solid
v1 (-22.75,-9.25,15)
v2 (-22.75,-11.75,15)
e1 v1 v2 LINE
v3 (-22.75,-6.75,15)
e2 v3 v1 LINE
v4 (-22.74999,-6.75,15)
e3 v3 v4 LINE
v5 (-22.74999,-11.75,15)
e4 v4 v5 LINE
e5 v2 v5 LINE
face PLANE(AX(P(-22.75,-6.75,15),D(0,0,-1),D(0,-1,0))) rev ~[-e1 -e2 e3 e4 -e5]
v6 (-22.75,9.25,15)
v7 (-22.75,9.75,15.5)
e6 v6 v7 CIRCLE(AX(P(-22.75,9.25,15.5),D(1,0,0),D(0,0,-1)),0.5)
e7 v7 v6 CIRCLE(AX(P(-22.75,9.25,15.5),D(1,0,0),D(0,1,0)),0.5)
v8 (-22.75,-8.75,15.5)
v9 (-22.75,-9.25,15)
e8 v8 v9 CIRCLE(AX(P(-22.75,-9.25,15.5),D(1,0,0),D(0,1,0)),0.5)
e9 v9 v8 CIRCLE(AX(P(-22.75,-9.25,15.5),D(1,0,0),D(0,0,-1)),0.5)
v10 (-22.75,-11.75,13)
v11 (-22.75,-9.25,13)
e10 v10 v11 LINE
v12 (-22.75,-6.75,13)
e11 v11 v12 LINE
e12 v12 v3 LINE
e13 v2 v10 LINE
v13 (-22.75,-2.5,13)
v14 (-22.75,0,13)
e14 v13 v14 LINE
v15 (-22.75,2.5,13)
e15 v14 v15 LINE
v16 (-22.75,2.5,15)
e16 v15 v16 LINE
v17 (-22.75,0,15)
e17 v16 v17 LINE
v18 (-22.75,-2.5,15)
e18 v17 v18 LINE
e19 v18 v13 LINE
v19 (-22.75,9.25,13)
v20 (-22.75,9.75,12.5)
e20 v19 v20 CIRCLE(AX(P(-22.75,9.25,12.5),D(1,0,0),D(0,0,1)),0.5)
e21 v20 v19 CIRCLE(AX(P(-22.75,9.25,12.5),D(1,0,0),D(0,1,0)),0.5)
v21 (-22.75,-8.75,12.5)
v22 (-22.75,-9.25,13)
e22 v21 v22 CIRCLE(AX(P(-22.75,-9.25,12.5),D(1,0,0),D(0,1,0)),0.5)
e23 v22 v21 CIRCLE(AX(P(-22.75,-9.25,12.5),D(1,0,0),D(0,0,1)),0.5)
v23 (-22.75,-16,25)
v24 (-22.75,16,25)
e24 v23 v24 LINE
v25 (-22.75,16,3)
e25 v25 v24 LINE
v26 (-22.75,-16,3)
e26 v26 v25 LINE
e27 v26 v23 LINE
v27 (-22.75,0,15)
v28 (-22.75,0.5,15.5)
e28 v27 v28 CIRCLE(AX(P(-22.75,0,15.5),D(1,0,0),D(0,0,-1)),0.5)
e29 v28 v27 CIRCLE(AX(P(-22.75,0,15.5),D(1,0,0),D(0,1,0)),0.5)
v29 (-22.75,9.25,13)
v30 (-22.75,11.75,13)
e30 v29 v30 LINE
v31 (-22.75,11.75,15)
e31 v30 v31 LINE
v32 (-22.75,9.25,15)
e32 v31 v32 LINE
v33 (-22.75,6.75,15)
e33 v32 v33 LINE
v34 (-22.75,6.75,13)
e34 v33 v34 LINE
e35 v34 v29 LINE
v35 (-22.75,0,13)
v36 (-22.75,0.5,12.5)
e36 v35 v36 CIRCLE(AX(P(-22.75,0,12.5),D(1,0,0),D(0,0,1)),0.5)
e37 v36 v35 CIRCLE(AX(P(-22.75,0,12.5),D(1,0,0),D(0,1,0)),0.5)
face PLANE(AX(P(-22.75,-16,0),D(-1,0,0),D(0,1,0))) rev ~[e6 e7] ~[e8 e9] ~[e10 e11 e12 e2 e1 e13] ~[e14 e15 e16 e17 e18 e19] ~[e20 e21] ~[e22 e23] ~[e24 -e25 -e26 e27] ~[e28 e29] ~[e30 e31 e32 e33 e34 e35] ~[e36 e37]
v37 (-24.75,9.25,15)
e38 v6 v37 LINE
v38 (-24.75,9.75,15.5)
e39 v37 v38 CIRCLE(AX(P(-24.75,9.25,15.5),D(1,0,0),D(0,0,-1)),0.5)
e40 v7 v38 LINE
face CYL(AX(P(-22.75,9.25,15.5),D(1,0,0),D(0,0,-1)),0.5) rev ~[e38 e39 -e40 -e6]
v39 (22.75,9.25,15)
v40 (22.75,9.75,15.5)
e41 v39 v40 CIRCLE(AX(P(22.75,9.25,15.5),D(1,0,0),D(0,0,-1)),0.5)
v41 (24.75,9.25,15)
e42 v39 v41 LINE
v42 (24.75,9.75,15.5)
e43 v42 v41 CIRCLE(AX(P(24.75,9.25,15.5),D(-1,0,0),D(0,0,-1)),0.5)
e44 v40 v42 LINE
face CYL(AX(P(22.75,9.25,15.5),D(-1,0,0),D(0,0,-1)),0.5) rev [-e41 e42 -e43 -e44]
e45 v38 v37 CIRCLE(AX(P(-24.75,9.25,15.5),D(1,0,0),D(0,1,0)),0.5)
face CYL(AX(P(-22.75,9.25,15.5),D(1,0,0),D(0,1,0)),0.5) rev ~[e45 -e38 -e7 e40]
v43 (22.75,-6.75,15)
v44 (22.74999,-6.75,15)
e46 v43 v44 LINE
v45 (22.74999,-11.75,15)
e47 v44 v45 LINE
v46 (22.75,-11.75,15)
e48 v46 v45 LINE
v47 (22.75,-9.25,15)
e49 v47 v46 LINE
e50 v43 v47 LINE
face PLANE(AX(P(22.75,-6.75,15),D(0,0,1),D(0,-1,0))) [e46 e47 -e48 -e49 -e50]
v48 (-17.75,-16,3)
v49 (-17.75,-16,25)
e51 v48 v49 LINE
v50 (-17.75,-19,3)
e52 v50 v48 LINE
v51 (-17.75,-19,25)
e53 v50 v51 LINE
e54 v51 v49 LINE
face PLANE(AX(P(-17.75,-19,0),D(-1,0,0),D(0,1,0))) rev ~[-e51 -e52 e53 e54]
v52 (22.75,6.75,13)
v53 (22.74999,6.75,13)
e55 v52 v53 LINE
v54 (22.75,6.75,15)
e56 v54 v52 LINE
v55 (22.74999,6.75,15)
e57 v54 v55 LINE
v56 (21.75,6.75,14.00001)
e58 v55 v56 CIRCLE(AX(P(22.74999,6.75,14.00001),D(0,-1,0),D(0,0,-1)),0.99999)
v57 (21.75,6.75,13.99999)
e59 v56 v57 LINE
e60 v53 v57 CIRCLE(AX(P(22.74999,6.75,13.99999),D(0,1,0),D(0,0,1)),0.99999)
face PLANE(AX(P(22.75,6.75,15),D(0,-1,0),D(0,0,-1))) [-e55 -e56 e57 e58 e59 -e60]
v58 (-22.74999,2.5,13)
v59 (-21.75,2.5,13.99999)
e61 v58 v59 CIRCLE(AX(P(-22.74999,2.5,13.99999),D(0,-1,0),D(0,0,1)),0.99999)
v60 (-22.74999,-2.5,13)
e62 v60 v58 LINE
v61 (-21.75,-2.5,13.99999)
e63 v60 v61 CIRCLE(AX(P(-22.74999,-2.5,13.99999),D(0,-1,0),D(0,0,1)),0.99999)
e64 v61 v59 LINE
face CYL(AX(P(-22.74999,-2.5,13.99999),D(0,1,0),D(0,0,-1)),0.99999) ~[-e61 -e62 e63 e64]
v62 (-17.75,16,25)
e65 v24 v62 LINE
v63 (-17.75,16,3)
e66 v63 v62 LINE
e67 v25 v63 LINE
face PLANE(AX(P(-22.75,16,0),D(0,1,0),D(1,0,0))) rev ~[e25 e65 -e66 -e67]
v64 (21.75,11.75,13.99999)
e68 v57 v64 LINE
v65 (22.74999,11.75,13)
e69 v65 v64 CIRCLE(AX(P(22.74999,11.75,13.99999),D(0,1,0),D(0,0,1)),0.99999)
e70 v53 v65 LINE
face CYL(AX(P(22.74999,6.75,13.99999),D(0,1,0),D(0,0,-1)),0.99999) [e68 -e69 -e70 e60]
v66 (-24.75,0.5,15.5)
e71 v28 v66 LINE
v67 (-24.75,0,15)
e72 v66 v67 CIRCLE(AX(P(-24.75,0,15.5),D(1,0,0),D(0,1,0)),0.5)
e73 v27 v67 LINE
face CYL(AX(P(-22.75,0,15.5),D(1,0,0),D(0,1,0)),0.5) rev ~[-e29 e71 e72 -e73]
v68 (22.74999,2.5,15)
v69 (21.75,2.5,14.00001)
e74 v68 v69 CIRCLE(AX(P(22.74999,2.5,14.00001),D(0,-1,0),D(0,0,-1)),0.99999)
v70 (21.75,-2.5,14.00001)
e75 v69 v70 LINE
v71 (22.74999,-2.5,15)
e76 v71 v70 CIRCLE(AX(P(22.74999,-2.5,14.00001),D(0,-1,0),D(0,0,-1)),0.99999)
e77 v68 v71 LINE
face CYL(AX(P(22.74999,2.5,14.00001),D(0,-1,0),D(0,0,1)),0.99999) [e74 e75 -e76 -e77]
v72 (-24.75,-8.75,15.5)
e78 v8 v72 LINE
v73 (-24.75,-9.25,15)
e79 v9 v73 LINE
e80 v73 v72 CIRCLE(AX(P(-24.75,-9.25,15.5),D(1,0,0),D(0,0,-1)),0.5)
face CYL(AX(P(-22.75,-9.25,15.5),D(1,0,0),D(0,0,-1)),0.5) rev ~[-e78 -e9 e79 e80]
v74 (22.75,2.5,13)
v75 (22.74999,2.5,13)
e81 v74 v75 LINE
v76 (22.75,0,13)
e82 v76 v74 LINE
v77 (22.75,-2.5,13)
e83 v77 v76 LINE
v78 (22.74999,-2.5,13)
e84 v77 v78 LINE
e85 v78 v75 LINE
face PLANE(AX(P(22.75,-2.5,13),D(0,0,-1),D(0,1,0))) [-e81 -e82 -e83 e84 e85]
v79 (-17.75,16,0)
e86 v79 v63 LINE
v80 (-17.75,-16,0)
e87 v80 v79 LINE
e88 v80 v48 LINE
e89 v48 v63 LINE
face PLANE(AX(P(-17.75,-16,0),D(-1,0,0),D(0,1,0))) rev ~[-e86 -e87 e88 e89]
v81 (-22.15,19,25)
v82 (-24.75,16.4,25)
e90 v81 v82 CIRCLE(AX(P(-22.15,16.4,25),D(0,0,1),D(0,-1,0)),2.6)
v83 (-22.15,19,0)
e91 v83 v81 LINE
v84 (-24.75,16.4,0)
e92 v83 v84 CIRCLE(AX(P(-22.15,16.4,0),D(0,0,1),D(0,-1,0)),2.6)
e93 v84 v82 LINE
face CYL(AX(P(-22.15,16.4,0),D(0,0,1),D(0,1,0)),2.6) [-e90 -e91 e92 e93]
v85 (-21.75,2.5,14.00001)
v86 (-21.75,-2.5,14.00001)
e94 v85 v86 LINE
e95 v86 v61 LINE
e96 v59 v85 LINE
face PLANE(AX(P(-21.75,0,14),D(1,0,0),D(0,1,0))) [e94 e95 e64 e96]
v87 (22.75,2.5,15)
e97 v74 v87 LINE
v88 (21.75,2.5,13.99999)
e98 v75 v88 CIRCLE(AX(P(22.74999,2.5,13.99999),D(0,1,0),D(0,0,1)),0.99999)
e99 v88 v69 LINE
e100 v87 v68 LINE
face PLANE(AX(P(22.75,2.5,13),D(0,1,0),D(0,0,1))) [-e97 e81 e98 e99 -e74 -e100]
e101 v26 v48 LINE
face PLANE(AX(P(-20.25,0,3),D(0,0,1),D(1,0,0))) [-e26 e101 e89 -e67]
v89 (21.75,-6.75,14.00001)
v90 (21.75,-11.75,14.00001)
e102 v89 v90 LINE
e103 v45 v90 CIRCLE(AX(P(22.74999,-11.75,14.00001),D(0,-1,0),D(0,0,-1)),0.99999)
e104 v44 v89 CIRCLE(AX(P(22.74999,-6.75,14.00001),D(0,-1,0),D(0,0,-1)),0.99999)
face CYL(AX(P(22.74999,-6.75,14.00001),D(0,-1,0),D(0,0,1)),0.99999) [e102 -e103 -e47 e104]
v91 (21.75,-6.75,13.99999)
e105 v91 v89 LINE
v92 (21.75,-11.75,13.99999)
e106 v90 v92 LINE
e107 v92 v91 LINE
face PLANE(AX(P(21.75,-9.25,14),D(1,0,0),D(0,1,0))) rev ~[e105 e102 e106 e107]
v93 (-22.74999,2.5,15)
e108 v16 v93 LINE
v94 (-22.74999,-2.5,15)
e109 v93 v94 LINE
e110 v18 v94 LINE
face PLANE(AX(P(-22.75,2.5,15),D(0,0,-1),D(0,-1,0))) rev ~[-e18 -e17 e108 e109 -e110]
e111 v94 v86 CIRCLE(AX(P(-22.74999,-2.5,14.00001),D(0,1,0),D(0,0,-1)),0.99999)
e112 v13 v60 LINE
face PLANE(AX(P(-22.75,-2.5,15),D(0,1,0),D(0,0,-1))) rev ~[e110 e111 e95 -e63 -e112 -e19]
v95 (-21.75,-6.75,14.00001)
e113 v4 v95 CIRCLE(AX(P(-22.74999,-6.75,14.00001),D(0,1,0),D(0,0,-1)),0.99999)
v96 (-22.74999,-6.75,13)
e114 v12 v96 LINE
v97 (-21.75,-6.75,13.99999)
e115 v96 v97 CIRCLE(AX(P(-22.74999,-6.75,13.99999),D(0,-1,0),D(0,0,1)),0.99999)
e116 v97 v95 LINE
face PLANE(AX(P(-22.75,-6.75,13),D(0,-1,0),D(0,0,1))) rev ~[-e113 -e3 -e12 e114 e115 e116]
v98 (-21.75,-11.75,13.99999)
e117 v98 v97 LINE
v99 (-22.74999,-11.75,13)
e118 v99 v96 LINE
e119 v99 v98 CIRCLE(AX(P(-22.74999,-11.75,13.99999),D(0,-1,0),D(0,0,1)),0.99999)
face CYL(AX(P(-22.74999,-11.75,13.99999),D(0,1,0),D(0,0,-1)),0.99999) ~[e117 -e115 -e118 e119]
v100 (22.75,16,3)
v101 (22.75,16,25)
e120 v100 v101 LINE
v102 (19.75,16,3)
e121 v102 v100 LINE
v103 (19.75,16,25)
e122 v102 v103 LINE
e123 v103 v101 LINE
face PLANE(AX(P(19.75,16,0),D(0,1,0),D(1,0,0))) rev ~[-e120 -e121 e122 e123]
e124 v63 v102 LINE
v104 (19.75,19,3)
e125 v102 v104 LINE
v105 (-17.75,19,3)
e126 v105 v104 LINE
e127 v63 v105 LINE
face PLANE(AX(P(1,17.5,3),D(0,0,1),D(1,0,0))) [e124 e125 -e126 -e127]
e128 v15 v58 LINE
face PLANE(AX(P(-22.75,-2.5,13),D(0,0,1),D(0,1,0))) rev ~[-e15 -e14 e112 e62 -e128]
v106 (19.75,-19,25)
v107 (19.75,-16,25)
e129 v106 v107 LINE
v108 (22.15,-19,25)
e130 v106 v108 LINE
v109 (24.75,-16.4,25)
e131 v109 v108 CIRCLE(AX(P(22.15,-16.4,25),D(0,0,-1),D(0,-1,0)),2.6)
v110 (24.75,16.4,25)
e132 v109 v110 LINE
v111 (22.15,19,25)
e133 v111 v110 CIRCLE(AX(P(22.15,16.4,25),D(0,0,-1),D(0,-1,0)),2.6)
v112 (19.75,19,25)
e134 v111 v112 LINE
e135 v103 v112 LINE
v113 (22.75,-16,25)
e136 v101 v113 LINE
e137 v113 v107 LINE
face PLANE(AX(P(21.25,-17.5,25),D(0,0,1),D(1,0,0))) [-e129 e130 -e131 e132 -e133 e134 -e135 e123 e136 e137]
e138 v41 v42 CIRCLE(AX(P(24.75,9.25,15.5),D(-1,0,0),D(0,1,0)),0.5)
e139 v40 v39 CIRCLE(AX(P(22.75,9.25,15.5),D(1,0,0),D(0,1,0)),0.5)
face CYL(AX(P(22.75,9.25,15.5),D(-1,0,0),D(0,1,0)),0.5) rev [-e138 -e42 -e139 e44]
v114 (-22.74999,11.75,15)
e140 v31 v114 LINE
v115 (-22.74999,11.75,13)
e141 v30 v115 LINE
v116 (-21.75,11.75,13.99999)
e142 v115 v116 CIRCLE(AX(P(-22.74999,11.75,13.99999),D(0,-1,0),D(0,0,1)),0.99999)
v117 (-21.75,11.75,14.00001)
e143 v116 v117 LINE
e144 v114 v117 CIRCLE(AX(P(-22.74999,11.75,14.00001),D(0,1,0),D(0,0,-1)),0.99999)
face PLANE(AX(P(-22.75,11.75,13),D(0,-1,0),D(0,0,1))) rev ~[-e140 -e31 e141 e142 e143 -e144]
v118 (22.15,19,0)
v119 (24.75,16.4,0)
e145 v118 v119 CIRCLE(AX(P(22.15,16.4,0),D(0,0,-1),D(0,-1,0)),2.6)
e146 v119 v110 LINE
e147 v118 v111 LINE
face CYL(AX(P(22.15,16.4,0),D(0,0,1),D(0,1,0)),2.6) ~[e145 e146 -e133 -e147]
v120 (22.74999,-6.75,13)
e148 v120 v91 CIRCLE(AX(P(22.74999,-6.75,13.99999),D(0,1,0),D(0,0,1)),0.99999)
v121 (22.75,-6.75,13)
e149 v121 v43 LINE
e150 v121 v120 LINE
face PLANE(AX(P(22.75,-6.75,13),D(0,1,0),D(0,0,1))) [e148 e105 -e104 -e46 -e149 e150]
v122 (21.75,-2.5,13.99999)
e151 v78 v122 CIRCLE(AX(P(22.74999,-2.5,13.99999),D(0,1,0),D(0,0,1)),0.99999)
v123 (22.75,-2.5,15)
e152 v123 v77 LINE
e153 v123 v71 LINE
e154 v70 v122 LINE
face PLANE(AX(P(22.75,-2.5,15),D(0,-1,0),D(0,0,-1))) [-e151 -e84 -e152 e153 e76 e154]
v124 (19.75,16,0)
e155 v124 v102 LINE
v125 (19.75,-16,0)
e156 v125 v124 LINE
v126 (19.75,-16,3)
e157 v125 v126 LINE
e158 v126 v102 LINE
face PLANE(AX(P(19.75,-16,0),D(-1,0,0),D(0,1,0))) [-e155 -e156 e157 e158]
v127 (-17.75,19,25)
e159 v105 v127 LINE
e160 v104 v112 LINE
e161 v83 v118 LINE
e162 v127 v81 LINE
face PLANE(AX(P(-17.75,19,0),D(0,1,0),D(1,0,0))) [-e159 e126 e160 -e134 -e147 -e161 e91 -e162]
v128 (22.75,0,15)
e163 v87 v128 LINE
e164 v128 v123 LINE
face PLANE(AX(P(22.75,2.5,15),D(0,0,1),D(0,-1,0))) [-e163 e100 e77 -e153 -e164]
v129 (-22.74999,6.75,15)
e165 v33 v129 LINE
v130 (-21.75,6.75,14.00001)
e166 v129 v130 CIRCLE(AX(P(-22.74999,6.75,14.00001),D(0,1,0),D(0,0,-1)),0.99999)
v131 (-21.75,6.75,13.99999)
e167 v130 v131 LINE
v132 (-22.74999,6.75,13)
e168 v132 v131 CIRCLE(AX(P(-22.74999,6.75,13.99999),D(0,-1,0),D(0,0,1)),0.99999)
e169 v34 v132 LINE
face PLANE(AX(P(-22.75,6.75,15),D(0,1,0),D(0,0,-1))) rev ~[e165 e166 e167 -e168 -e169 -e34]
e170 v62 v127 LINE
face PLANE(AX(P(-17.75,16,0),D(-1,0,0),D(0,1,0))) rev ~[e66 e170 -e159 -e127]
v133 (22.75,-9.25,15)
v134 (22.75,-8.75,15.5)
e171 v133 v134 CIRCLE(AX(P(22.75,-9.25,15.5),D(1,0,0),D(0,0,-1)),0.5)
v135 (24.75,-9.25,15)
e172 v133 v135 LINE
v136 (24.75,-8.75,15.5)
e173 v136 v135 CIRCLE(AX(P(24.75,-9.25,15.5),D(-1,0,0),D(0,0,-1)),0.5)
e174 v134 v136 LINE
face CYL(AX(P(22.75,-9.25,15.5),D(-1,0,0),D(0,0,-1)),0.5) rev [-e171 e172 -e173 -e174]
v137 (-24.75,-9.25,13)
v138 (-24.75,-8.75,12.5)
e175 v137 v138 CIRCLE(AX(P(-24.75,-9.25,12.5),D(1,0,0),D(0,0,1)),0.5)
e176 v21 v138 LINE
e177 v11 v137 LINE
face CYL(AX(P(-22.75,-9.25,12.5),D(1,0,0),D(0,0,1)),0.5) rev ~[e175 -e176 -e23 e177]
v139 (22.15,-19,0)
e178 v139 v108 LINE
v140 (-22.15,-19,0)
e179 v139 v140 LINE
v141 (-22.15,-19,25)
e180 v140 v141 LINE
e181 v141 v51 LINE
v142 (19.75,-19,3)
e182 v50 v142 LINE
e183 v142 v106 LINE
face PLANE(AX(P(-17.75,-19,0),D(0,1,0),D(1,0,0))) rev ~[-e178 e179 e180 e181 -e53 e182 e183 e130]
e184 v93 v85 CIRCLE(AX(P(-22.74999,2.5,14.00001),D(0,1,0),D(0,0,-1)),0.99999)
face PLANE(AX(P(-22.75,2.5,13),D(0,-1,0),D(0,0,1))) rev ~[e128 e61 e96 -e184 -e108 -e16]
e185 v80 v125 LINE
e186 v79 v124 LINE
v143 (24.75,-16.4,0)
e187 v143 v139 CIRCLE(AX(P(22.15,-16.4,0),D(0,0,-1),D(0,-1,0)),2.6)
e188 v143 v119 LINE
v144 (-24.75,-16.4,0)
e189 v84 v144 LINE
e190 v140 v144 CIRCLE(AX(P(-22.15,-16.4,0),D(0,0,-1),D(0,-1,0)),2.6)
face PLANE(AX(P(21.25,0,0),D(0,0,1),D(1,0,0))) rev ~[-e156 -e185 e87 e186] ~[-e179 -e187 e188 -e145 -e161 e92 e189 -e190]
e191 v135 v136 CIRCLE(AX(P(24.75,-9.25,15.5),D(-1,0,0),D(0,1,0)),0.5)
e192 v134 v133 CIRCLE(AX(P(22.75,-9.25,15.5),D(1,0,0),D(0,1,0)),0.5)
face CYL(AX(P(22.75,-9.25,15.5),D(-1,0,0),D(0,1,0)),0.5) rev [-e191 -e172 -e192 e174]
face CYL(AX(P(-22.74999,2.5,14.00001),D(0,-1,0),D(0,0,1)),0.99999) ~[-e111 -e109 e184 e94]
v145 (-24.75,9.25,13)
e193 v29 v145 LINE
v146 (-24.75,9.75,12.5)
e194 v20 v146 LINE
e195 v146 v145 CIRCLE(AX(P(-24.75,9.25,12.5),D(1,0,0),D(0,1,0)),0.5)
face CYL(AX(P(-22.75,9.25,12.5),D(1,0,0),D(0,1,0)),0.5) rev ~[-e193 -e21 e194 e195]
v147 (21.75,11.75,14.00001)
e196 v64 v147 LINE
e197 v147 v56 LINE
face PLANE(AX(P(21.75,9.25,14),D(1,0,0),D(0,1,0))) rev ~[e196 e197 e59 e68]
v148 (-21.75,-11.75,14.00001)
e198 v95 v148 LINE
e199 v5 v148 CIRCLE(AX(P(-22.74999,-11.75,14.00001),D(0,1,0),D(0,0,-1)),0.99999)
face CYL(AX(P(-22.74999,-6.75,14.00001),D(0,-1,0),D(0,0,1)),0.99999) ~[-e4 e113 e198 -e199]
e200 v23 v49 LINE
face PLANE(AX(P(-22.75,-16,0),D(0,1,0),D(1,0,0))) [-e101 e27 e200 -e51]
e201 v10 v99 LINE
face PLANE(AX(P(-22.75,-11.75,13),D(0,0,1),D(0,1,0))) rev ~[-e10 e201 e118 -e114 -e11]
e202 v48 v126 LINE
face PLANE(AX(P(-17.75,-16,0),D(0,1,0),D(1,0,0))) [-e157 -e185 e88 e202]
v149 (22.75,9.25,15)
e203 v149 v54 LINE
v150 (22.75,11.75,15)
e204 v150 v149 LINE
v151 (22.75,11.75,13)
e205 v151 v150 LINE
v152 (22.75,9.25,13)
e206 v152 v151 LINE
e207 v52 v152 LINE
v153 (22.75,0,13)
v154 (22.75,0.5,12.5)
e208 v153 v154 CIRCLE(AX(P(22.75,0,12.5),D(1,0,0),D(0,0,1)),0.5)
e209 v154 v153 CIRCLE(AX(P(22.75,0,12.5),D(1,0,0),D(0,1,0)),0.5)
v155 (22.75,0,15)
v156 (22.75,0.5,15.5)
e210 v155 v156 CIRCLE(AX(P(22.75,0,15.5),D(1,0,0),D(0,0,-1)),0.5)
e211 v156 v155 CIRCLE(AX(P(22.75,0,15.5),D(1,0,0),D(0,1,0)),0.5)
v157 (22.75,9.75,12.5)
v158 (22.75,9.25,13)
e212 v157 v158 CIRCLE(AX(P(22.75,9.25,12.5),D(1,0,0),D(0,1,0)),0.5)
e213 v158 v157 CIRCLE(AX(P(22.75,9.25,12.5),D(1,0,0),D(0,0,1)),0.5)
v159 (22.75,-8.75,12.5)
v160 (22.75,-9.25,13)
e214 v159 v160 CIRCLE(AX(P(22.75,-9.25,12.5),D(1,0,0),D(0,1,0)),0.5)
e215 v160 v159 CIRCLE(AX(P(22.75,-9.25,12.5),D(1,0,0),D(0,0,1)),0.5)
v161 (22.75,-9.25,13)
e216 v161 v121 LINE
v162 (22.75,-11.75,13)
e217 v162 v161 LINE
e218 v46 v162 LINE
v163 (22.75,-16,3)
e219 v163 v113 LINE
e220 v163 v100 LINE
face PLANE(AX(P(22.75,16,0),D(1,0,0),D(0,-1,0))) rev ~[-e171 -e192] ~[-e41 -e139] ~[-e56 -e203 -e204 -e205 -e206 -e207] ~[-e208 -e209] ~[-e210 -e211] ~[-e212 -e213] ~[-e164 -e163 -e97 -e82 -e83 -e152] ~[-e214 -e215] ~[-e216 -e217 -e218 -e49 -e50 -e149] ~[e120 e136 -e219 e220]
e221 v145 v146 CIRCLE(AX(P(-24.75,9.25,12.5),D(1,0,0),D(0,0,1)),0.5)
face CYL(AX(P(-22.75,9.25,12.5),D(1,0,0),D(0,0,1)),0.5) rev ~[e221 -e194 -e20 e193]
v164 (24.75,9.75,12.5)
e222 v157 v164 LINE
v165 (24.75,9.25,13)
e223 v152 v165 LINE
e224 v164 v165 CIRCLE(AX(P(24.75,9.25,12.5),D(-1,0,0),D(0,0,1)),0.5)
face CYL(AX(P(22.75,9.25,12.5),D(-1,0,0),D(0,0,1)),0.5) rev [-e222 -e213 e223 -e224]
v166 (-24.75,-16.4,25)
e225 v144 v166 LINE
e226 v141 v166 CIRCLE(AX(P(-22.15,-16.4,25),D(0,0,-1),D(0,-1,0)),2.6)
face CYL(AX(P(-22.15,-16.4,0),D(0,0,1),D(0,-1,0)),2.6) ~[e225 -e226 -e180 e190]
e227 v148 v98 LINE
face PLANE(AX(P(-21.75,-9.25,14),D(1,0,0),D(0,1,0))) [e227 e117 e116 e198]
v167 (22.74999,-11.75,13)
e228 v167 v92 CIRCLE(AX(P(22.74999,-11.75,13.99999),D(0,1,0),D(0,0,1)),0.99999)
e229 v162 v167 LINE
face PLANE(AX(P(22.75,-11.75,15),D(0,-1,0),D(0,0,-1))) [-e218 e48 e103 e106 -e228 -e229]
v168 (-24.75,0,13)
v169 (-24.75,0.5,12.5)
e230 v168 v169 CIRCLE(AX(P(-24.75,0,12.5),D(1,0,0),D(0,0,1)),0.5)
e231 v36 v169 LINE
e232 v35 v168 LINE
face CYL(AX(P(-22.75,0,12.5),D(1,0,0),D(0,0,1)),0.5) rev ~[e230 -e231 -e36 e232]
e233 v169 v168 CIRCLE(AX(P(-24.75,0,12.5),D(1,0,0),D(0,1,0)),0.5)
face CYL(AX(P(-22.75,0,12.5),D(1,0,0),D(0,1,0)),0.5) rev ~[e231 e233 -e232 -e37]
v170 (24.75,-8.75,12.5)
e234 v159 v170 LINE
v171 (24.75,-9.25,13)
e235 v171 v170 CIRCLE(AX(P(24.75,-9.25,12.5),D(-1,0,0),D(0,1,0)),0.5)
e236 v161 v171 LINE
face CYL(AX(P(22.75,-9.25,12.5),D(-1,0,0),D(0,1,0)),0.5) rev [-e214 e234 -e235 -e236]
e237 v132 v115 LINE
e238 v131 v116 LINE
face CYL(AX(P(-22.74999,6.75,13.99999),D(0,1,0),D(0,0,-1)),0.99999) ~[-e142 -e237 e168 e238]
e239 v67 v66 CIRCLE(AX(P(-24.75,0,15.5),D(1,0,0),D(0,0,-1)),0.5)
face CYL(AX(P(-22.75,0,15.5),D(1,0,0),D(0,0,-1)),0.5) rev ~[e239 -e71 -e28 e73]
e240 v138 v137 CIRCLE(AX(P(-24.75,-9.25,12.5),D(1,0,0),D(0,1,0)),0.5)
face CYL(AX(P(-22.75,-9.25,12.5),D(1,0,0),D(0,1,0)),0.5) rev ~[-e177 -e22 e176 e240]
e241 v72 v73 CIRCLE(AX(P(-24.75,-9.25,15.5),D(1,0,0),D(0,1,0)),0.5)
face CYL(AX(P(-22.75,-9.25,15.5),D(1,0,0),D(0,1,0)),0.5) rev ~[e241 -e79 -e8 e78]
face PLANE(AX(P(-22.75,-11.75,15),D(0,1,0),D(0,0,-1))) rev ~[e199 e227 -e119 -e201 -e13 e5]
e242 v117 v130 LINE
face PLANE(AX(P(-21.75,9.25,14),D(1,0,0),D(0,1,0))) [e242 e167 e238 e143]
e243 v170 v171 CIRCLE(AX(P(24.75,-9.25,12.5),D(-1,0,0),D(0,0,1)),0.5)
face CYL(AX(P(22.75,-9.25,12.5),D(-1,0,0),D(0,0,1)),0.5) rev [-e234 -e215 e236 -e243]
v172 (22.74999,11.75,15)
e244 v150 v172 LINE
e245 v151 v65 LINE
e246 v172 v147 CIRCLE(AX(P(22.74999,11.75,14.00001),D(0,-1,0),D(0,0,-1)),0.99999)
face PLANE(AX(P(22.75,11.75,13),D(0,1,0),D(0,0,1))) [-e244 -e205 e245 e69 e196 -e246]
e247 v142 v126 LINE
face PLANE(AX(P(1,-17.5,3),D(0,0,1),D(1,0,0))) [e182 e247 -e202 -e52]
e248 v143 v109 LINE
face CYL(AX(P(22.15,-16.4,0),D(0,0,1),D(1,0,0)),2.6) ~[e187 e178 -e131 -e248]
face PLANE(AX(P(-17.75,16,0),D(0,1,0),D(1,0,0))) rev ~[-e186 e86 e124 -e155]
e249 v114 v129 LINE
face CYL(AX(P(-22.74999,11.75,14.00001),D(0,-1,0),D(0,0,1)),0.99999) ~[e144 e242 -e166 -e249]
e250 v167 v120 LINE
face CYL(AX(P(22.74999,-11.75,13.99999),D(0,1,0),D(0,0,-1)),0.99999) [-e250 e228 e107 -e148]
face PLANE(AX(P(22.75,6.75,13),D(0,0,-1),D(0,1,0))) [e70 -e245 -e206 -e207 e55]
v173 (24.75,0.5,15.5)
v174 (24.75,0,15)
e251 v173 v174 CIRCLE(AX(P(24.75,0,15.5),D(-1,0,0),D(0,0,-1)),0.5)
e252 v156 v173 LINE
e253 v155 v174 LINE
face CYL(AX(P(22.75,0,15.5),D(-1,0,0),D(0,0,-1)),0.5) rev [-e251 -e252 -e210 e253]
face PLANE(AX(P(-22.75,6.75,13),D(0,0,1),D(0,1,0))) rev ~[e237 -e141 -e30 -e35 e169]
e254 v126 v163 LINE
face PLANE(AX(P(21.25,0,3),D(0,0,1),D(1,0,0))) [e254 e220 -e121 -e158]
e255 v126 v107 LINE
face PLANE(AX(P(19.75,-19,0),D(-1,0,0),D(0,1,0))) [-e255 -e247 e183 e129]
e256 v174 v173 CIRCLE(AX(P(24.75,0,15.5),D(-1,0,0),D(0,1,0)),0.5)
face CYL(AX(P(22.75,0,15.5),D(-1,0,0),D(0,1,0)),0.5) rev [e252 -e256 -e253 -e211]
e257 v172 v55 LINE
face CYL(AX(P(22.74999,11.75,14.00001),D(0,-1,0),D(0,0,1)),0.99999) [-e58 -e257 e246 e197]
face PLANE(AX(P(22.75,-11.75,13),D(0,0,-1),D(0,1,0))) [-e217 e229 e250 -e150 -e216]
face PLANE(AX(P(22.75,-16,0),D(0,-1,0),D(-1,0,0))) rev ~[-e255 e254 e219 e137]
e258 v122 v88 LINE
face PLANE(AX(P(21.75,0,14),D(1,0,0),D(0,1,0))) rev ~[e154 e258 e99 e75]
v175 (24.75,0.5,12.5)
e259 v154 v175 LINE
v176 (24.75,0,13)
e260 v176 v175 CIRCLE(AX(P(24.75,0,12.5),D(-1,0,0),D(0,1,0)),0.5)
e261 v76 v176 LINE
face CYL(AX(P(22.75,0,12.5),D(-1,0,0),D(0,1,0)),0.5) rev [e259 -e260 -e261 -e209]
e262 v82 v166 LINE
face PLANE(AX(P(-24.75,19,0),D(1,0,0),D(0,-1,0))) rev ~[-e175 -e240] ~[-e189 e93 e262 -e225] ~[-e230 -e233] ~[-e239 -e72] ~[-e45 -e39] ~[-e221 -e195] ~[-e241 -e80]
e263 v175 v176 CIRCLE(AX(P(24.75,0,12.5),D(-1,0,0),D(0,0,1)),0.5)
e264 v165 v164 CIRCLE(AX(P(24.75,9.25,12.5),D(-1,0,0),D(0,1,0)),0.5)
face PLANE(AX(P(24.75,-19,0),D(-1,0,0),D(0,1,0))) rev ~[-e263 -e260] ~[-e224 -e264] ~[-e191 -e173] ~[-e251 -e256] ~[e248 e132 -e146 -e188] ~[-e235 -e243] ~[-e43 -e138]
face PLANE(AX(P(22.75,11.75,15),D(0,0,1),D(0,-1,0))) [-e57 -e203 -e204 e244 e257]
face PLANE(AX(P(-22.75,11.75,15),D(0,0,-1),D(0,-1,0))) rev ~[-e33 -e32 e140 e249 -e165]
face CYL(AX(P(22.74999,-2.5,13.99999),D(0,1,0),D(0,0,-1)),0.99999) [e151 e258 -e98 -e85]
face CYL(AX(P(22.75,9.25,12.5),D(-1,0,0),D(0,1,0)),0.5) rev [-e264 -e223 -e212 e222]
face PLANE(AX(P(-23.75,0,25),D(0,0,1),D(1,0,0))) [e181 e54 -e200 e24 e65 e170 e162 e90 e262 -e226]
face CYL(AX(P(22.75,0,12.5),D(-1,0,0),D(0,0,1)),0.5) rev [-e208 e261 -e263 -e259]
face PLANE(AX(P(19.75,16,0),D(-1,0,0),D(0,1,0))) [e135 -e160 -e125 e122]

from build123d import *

# Parameters (mm, degrees)
F0_W      = 2
F0_H      = 32
F0_H_2    = 3
F0_W_2    = 5
F1_DEPTH  = 25
F0_W_3    = 3
F0_W_4    = 37.5
F2_DEPTH  = 3
F3_R      = 2.6
F6_DEPTH  = 1
F7_R      = 0.99999
F10_DEPTH = 1
F11_R     = 0.99999
F12_DEPTH = 5
F13_DEPTH = 5


# Not quite as in the source:
# - a fillet or chamfer is up to 0.001 mm smaller than in the source, because OpenCascade refuses the exact size
# - a feature names something its author has since deleted; it is built from what else it names


with BuildPart() as f1:
    # F0 (on Top) → F1 (new body)
    with BuildSketch(Plane.XY):
        with Locations((-23.75, 0)):
            Rectangle(F0_W, F0_H)
        with Locations((-23.75, 17.5)):
            Rectangle(F0_W, F0_H_2)
        with Locations((-23.75, -17.5)):
            Rectangle(F0_W, F0_H_2)
        with Locations((-20.25, 17.5)):
            Rectangle(F0_W_2, F0_H_2)
        with Locations((-20.25, -17.5)):
            Rectangle(F0_W_2, F0_H_2)
    extrude(amount=F1_DEPTH)



with BuildPart() as f1b:
    # F0 (on Top) → F1, piece 2 (new body)
    with BuildSketch(Plane.XY):
        with Locations((21.25, -17.5)):
            Rectangle(F0_W_3, F0_H_2)
        with Locations((23.75, -17.5)):
            Rectangle(F0_W, F0_H_2)
        with Locations((23.75, 0)):
            Rectangle(F0_W, F0_H)
        with Locations((23.75, 17.5)):
            Rectangle(F0_W, F0_H_2)
        with Locations((21.25, 17.5)):
            Rectangle(F0_W_3, F0_H_2)
    extrude(amount=F1_DEPTH)


with BuildPart() as f1_1:
    add(f1.part)

    add(f1b.part)  # F2 merges F1b
    # F0 (on Top) → F2 (join)
    with BuildSketch(Plane.XY):
        with Locations((21.25, 0)):
            Rectangle(F0_W_3, F0_H)
        with Locations((1, 17.5)):
            Rectangle(F0_W_4, F0_H_2)
        with Locations((-20.25, 0)):
            Rectangle(F0_W_2, F0_H)
        with Locations((1, -17.5)):
            Rectangle(F0_W_4, F0_H_2)
    extrude(amount=F2_DEPTH)

    # F3
    f3_edges = [f1_1.edges().sort_by_distance(p)[0] for p in [
        (-24.75, 19, 12.5),
        (24.75, 19, 12.5),
        (24.75, -19, 12.5),
        (-24.75, -19, 12.5),
    ]]
    fillet(f3_edges, radius=F3_R)

    # F5 (on face) → F6 (join)
    with BuildSketch(Plane.YZ.offset(22.75)):
        Polygon((-11.75, 15), (-11.75, 13), (-9.25, 13), (-6.75, 13), (-6.75, 15), (-9.25, 15), align=None)
        Polygon((-2.5, 15), (-2.5, 13), (0, 13), (2.5, 13), (2.5, 15), (0, 15), align=None)
        Polygon((6.75, 15), (6.75, 13), (9.25, 13), (11.75, 13), (11.75, 15), (9.25, 15), align=None)
    extrude(amount=-F6_DEPTH)

    # F7 (radius 1 in the source; OpenCascade refuses exactly that, so slightly less here)
    f7_edges = [f1_1.edges().sort_by_distance(p)[0] for p in [
        (21.75, -9.25, 15),
        (21.75, -9.25, 13),
        (21.75, 0, 15),
        (21.75, 0, 13),
        (21.75, 9.25, 13),
        (21.75, 9.25, 15),
    ]]
    fillet(f7_edges, radius=F7_R)

    # F9 (on face) → F10 (join)
    with BuildSketch(Plane.YZ.offset(-22.75)):
        Polygon((-11.75, 15), (-11.75, 13), (-9.25, 13), (-6.75, 13), (-6.75, 15), (-9.25, 15), align=None)
        Polygon((-2.5, 15), (-2.5, 13), (0, 13), (2.5, 13), (2.5, 15), (0, 15), align=None)
        Polygon((6.75, 15), (6.75, 13), (9.25, 13), (11.75, 13), (11.75, 15), (9.25, 15), align=None)
    extrude(amount=F10_DEPTH)

    # F11 (radius 1 in the source; OpenCascade refuses exactly that, so slightly less here)
    f11_edges = [f1_1.edges().sort_by_distance(p)[0] for p in [
        (-21.75, -9.25, 15),
        (-21.75, -9.25, 13),
        (-21.75, 0, 15),
        (-21.75, 9.25, 15),
        (-21.75, 0, 13),
        (-21.75, 9.25, 13),
    ]]
    fillet(f11_edges, radius=F11_R)

    # F5 (on face) → F12 (cut)
    with BuildSketch(Plane.YZ.offset(22.75)):
        with BuildLine():
            ThreePointArc((-8.75, 15.5), (-9.6035533906, 15.8535533906), (-9.25, 15))
            ThreePointArc((-9.25, 15), (-8.8964466094, 15.1464466094), (-8.75, 15.5))
        make_face()
        with BuildLine():
            ThreePointArc((0.5, 15.5), (-0.3535533906, 15.8535533906), (0, 15))
            ThreePointArc((0, 15), (0.3535533906, 15.1464466094), (0.5, 15.5))
        make_face()
        with BuildLine():
            ThreePointArc((9.75, 15.5), (8.8964466094, 15.8535533906), (9.25, 15))
            ThreePointArc((9.25, 15), (9.6035533906, 15.1464466094), (9.75, 15.5))
        make_face()
        with BuildLine():
            ThreePointArc((9.75, 12.5), (9.6035533906, 12.8535533906), (9.25, 13))
            ThreePointArc((9.25, 13), (8.8964466094, 12.1464466094), (9.75, 12.5))
        make_face()
        with BuildLine():
            ThreePointArc((0.5, 12.5), (0.3535533906, 12.8535533906), (0, 13))
            ThreePointArc((0, 13), (-0.3535533906, 12.1464466094), (0.5, 12.5))
        make_face()
        with BuildLine():
            ThreePointArc((-8.75, 12.5), (-8.8964466094, 12.8535533906), (-9.25, 13))
            ThreePointArc((-9.25, 13), (-9.6035533906, 12.1464466094), (-8.75, 12.5))
        make_face()
    extrude(amount=F12_DEPTH, mode=Mode.SUBTRACT)

    # F9 (on face) → F13 (cut)
    with BuildSketch(Plane.YZ.offset(-22.75)):
        with BuildLine():
            ThreePointArc((-8.75, 15.5), (-9.6035533906, 15.8535533906), (-9.25, 15))
            ThreePointArc((-9.25, 15), (-8.8964466094, 15.1464466094), (-8.75, 15.5))
        make_face()
        with BuildLine():
            ThreePointArc((0.5, 15.5), (-0.3535533906, 15.8535533906), (0, 15))
            ThreePointArc((0, 15), (0.3535533906, 15.1464466094), (0.5, 15.5))
        make_face()
        with BuildLine():
            ThreePointArc((9.75, 15.5), (8.8964466094, 15.8535533906), (9.25, 15))
            ThreePointArc((9.25, 15), (9.6035533906, 15.1464466094), (9.75, 15.5))
        make_face()
        with BuildLine():
            ThreePointArc((9.75, 12.5), (9.6035533906, 12.8535533906), (9.25, 13))
            ThreePointArc((9.25, 13), (8.8964466094, 12.1464466094), (9.75, 12.5))
        make_face()
        with BuildLine():
            ThreePointArc((0.5, 12.5), (0.3535533906, 12.8535533906), (0, 13))
            ThreePointArc((0, 13), (-0.3535533906, 12.1464466094), (0.5, 12.5))
        make_face()
        with BuildLine():
            ThreePointArc((-8.75, 12.5), (-8.8964466094, 12.8535533906), (-9.25, 13))
            ThreePointArc((-9.25, 13), (-9.6035533906, 12.1464466094), (-8.75, 12.5))
        make_face()
    extrude(amount=-F13_DEPTH, mode=Mode.SUBTRACT)


solid = f1_1.part
